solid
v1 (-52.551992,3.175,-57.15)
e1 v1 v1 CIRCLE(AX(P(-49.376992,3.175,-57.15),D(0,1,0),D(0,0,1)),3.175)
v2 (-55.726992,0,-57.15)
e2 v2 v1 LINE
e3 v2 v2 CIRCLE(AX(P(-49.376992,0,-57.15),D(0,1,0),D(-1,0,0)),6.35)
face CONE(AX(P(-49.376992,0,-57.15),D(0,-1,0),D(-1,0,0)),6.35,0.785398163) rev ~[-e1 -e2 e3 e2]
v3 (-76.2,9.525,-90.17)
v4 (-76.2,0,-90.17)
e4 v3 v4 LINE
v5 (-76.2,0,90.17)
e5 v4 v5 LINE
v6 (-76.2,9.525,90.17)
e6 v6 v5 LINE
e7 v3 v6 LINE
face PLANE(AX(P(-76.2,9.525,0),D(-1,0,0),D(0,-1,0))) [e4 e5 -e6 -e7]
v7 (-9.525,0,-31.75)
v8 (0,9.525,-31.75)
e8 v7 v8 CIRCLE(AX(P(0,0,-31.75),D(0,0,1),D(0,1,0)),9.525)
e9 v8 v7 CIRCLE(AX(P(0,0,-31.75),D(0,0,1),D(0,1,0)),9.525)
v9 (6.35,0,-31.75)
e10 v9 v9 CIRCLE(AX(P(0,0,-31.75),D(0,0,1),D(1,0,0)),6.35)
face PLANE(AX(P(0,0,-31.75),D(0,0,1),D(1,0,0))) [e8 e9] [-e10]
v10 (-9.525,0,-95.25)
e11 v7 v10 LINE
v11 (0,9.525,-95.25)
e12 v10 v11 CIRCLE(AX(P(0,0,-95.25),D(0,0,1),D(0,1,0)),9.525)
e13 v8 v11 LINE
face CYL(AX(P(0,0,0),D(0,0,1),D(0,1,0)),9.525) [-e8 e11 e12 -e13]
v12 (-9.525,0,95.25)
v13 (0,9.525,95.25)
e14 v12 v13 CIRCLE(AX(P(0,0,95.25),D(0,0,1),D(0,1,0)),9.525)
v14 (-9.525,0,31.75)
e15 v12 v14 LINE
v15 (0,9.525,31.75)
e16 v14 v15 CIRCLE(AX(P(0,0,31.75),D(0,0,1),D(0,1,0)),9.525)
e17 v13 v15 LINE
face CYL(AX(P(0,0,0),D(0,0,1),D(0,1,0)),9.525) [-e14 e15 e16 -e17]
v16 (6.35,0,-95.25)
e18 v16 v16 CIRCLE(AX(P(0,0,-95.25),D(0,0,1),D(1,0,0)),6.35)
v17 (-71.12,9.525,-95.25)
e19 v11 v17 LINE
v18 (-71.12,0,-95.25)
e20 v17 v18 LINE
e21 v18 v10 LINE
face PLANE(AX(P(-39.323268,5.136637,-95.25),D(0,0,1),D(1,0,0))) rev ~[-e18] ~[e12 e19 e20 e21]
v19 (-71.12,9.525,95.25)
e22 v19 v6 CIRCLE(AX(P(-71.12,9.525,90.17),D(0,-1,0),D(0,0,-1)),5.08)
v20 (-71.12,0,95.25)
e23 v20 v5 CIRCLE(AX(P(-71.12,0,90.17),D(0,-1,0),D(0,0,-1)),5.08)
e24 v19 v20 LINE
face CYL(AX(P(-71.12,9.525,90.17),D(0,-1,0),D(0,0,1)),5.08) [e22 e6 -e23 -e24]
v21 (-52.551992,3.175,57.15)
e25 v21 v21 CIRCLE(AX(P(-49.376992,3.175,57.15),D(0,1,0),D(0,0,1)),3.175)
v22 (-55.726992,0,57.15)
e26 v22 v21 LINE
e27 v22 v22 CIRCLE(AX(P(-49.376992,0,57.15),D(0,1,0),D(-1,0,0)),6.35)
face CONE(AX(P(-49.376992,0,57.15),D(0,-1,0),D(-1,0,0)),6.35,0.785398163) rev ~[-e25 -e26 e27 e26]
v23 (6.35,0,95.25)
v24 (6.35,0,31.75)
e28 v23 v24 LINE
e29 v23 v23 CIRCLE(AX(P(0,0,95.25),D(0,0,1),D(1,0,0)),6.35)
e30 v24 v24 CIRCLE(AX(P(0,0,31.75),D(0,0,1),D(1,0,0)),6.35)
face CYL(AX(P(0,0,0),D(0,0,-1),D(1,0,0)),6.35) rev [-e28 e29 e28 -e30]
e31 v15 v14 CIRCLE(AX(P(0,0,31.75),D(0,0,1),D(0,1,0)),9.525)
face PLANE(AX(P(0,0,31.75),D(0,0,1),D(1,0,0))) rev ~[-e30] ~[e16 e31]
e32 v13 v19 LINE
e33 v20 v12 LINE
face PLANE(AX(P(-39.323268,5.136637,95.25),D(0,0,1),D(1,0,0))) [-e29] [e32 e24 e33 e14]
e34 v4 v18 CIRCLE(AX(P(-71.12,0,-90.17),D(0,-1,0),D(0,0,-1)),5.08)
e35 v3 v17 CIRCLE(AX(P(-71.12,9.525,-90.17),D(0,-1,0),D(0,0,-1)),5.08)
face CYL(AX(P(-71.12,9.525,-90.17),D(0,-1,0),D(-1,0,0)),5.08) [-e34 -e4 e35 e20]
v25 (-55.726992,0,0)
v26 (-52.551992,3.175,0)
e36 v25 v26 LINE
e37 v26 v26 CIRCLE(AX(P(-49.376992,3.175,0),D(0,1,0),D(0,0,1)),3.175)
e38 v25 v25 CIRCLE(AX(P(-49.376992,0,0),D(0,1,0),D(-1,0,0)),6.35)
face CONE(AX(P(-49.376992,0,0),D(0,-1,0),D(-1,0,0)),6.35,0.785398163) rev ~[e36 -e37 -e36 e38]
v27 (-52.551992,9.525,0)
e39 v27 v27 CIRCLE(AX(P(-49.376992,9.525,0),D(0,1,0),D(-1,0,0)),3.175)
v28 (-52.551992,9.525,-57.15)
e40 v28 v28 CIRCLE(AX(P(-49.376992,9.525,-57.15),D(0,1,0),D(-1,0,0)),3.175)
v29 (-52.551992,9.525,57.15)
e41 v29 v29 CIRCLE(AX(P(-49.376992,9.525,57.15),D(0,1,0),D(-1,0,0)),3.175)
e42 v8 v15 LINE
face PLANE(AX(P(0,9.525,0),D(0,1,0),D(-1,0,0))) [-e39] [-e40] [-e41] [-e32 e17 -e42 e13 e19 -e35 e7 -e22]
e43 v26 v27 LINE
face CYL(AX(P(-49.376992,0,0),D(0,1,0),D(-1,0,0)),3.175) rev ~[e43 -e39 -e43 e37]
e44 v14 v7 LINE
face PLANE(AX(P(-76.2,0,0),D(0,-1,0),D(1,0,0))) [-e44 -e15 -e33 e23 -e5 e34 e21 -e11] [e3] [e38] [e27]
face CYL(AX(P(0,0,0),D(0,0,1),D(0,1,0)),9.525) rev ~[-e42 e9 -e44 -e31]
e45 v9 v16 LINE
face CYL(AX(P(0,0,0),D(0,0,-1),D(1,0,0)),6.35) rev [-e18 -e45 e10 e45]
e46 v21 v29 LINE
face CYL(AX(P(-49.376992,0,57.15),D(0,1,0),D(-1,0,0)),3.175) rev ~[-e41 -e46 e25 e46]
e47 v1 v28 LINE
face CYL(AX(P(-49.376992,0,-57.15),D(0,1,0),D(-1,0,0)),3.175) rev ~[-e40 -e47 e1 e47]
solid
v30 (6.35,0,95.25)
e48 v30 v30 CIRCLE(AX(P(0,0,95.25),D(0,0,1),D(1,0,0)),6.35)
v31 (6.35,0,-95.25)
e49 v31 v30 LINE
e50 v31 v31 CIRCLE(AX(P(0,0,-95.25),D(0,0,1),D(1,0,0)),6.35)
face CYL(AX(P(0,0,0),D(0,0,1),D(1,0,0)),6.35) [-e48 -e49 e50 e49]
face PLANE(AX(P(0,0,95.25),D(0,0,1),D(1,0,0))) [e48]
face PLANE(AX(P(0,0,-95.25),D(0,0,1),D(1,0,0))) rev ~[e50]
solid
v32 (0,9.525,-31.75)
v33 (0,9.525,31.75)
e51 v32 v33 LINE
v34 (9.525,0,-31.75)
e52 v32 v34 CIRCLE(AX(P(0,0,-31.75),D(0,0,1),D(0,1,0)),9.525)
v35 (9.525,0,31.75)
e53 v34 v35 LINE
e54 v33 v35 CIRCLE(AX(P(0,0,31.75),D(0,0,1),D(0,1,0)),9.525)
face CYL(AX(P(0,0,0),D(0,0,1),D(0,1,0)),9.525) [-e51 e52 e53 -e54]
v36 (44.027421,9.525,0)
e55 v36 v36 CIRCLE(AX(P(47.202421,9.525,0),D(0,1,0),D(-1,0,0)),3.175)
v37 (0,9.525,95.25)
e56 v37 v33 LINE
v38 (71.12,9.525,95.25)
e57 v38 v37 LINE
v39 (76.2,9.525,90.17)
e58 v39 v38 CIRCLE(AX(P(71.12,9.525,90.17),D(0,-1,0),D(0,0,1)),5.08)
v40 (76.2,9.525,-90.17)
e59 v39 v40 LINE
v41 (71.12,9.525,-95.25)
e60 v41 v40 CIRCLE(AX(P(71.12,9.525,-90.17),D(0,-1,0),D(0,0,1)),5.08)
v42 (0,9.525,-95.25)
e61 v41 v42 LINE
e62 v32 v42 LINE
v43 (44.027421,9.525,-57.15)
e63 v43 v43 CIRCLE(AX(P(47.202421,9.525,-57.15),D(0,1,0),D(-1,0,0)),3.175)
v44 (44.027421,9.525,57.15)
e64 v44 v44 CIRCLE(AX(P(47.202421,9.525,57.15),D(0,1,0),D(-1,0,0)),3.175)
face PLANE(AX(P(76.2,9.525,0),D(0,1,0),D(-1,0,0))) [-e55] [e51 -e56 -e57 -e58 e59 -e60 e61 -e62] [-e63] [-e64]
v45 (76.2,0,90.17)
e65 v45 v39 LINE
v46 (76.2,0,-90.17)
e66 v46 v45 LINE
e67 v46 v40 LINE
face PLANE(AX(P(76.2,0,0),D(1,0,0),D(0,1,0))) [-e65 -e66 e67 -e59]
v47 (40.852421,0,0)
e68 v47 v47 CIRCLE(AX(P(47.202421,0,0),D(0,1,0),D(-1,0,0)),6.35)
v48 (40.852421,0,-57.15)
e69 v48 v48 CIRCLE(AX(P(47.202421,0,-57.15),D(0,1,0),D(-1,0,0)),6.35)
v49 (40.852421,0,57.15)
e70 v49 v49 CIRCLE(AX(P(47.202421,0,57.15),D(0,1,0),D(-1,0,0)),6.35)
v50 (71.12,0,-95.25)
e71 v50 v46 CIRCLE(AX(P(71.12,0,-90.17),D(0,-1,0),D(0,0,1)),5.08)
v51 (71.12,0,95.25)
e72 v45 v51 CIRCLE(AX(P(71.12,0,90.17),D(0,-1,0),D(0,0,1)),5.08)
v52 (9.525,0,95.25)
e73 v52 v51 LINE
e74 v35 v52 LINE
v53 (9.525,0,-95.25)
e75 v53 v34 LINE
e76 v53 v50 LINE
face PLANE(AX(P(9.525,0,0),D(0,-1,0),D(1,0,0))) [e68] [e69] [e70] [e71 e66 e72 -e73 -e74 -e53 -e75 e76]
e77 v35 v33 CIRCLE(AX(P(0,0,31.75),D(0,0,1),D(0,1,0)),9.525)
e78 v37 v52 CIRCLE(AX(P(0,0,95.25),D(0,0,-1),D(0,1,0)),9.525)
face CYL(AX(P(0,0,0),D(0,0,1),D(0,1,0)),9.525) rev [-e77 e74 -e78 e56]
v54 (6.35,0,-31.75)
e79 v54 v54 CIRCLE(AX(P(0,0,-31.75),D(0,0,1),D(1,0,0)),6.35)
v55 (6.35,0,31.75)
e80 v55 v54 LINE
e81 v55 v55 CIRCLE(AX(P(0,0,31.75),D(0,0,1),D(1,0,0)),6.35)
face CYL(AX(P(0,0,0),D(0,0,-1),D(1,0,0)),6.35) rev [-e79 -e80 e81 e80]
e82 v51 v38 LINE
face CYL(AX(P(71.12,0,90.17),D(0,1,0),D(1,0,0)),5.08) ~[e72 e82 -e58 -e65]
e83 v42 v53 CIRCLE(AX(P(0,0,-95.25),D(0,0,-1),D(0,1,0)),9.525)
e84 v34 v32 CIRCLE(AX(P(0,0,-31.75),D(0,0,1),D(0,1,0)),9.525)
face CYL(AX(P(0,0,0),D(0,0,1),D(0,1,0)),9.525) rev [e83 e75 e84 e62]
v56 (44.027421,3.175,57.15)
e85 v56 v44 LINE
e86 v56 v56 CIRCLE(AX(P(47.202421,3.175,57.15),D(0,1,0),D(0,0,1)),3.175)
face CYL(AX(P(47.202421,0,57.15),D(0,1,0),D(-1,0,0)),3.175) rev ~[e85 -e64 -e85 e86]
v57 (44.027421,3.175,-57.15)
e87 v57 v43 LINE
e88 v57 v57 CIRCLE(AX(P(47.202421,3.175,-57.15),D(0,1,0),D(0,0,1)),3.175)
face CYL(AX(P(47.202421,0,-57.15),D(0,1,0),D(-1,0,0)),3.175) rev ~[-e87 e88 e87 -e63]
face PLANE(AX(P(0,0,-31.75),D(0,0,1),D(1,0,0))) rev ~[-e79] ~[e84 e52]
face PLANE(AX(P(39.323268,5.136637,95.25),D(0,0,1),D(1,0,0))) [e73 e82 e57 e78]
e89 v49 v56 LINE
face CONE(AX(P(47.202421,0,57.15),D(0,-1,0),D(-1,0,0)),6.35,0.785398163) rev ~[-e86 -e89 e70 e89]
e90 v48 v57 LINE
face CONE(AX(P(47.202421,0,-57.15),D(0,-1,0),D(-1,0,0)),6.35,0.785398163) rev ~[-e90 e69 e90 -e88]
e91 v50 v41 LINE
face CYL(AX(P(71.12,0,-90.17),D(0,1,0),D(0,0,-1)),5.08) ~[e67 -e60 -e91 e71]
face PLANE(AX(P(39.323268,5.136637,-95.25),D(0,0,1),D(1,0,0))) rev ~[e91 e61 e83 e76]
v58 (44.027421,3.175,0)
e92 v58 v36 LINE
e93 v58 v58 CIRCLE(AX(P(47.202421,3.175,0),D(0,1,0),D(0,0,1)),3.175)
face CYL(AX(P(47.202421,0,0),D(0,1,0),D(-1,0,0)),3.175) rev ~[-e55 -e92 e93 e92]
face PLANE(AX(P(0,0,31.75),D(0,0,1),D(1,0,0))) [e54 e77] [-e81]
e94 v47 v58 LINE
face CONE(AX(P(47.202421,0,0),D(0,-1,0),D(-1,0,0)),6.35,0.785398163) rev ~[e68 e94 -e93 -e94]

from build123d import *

# Parameters (mm, degrees)
F0_R             = 6.35
F1_DEPTH         = 95.25
F2_DEPTH         = 31.75
F3_DEPTH         = 31.75
F4_DEPTH         = 95.25
F6_D             = 6.35
F6_CSINK_D       = 12.7
F6_CSINK_ANGLE   = 90
F6_2_D           = 6.35
F6_2_CSINK_D     = 12.7
F6_2_CSINK_ANGLE = 90
F7_DEPTH         = 95.25
F8_R             = 5.08
F8_2_R           = 5.08


with BuildPart() as f1:
    # F0 (on Top) → F1 (new body, symmetric)
    with BuildSketch(Plane.XY):
        with BuildLine():
            ThreePointArc((-9.525, 0), (-6.7351920908, 6.7351920908), (0, 9.525))
            Line((0, 9.525), (-76.2, 9.525))
            Line((-76.2, 9.525), (-76.2, 0))
            Line((-76.2, 0), (-9.525, 0))
        make_face()
        with BuildLine():
            ThreePointArc((-9.525, 0), (0, -9.525), (9.525, 0))
            ThreePointArc((9.525, 0), (6.7351920908, 6.7351920908), (0, 9.525))
            ThreePointArc((0, 9.525), (-6.7351920908, 6.7351920908), (-9.525, 0))
        make_face()
        Circle(F0_R, mode=Mode.SUBTRACT)
    extrude(amount=F1_DEPTH, both=True)

    # F0 (on Top) → F2 (cut, symmetric)
    with BuildSketch(Plane.XY):
        with BuildLine():
            ThreePointArc((-9.525, 0), (0, -9.525), (9.525, 0))
            ThreePointArc((9.525, 0), (6.7351920908, 6.7351920908), (0, 9.525))
            ThreePointArc((0, 9.525), (-6.7351920908, 6.7351920908), (-9.525, 0))
        make_face()
        Circle(F0_R, mode=Mode.SUBTRACT)
    extrude(amount=F2_DEPTH, both=True, mode=Mode.SUBTRACT)

    # F6 (through all)
    with Locations(Plane.XZ):
        with Locations((-49.3769919423, 57.15), (47.2024205584, 57.15), (47.2024205584, 0), (-49.3769919423, 0), (-49.3769919423, -57.15), (47.2024205584, -57.15)):
            CounterSinkHole(F6_D / 2, F6_CSINK_D / 2, counter_sink_angle=F6_CSINK_ANGLE)

    # F8
    f8_edges = [f1.edges().sort_by_distance(p)[0] for p in [
        (-76.2, 4.7625, -95.25),
        (-76.2, 4.7625, 95.25),
    ]]
    fillet(f8_edges, radius=F8_R)


with BuildPart() as f3:
    # F0 (on Top) → F3 (new body, symmetric)
    with BuildSketch(Plane.XY):
        with BuildLine():
            ThreePointArc((-9.525, 0), (0, -9.525), (9.525, 0))
            ThreePointArc((9.525, 0), (6.7351920908, 6.7351920908), (0, 9.525))
            ThreePointArc((0, 9.525), (-6.7351920908, 6.7351920908), (-9.525, 0))
        make_face()
        Circle(F0_R, mode=Mode.SUBTRACT)
    extrude(amount=F3_DEPTH, both=True)

    # F0 (on Top) → F4 (join, symmetric)
    with BuildSketch(Plane.XY):
        with BuildLine():
            ThreePointArc((0, 9.525), (6.7351920908, 6.7351920908), (9.525, 0))
            Line((9.525, 0), (76.2, 0))
            Line((76.2, 0), (76.2, 9.525))
            Line((76.2, 9.525), (0, 9.525))
        make_face()
    extrude(amount=F4_DEPTH, both=True)

    # F6#2 (through all)
    with Locations(Plane.XZ):
        with Locations((-49.3769919423, 57.15), (47.2024205584, 57.15), (47.2024205584, 0), (-49.3769919423, 0), (-49.3769919423, -57.15), (47.2024205584, -57.15)):
            CounterSinkHole(F6_2_D / 2, F6_2_CSINK_D / 2, counter_sink_angle=F6_2_CSINK_ANGLE)

    # F8#2
    f8_2_edges = [f3.edges().sort_by_distance(p)[0] for p in [
        (76.2, 4.7625, 95.25),
        (76.2, 4.7625, -95.25),
    ]]
    fillet(f8_2_edges, radius=F8_2_R)


with BuildPart() as f7:
    # F0 (on Top) → F7 (new body, symmetric)
    with BuildSketch(Plane.XY):
        Circle(F0_R)
    extrude(amount=F7_DEPTH, both=True)


solid = Compound([f1.part, f3.part, f7.part])
